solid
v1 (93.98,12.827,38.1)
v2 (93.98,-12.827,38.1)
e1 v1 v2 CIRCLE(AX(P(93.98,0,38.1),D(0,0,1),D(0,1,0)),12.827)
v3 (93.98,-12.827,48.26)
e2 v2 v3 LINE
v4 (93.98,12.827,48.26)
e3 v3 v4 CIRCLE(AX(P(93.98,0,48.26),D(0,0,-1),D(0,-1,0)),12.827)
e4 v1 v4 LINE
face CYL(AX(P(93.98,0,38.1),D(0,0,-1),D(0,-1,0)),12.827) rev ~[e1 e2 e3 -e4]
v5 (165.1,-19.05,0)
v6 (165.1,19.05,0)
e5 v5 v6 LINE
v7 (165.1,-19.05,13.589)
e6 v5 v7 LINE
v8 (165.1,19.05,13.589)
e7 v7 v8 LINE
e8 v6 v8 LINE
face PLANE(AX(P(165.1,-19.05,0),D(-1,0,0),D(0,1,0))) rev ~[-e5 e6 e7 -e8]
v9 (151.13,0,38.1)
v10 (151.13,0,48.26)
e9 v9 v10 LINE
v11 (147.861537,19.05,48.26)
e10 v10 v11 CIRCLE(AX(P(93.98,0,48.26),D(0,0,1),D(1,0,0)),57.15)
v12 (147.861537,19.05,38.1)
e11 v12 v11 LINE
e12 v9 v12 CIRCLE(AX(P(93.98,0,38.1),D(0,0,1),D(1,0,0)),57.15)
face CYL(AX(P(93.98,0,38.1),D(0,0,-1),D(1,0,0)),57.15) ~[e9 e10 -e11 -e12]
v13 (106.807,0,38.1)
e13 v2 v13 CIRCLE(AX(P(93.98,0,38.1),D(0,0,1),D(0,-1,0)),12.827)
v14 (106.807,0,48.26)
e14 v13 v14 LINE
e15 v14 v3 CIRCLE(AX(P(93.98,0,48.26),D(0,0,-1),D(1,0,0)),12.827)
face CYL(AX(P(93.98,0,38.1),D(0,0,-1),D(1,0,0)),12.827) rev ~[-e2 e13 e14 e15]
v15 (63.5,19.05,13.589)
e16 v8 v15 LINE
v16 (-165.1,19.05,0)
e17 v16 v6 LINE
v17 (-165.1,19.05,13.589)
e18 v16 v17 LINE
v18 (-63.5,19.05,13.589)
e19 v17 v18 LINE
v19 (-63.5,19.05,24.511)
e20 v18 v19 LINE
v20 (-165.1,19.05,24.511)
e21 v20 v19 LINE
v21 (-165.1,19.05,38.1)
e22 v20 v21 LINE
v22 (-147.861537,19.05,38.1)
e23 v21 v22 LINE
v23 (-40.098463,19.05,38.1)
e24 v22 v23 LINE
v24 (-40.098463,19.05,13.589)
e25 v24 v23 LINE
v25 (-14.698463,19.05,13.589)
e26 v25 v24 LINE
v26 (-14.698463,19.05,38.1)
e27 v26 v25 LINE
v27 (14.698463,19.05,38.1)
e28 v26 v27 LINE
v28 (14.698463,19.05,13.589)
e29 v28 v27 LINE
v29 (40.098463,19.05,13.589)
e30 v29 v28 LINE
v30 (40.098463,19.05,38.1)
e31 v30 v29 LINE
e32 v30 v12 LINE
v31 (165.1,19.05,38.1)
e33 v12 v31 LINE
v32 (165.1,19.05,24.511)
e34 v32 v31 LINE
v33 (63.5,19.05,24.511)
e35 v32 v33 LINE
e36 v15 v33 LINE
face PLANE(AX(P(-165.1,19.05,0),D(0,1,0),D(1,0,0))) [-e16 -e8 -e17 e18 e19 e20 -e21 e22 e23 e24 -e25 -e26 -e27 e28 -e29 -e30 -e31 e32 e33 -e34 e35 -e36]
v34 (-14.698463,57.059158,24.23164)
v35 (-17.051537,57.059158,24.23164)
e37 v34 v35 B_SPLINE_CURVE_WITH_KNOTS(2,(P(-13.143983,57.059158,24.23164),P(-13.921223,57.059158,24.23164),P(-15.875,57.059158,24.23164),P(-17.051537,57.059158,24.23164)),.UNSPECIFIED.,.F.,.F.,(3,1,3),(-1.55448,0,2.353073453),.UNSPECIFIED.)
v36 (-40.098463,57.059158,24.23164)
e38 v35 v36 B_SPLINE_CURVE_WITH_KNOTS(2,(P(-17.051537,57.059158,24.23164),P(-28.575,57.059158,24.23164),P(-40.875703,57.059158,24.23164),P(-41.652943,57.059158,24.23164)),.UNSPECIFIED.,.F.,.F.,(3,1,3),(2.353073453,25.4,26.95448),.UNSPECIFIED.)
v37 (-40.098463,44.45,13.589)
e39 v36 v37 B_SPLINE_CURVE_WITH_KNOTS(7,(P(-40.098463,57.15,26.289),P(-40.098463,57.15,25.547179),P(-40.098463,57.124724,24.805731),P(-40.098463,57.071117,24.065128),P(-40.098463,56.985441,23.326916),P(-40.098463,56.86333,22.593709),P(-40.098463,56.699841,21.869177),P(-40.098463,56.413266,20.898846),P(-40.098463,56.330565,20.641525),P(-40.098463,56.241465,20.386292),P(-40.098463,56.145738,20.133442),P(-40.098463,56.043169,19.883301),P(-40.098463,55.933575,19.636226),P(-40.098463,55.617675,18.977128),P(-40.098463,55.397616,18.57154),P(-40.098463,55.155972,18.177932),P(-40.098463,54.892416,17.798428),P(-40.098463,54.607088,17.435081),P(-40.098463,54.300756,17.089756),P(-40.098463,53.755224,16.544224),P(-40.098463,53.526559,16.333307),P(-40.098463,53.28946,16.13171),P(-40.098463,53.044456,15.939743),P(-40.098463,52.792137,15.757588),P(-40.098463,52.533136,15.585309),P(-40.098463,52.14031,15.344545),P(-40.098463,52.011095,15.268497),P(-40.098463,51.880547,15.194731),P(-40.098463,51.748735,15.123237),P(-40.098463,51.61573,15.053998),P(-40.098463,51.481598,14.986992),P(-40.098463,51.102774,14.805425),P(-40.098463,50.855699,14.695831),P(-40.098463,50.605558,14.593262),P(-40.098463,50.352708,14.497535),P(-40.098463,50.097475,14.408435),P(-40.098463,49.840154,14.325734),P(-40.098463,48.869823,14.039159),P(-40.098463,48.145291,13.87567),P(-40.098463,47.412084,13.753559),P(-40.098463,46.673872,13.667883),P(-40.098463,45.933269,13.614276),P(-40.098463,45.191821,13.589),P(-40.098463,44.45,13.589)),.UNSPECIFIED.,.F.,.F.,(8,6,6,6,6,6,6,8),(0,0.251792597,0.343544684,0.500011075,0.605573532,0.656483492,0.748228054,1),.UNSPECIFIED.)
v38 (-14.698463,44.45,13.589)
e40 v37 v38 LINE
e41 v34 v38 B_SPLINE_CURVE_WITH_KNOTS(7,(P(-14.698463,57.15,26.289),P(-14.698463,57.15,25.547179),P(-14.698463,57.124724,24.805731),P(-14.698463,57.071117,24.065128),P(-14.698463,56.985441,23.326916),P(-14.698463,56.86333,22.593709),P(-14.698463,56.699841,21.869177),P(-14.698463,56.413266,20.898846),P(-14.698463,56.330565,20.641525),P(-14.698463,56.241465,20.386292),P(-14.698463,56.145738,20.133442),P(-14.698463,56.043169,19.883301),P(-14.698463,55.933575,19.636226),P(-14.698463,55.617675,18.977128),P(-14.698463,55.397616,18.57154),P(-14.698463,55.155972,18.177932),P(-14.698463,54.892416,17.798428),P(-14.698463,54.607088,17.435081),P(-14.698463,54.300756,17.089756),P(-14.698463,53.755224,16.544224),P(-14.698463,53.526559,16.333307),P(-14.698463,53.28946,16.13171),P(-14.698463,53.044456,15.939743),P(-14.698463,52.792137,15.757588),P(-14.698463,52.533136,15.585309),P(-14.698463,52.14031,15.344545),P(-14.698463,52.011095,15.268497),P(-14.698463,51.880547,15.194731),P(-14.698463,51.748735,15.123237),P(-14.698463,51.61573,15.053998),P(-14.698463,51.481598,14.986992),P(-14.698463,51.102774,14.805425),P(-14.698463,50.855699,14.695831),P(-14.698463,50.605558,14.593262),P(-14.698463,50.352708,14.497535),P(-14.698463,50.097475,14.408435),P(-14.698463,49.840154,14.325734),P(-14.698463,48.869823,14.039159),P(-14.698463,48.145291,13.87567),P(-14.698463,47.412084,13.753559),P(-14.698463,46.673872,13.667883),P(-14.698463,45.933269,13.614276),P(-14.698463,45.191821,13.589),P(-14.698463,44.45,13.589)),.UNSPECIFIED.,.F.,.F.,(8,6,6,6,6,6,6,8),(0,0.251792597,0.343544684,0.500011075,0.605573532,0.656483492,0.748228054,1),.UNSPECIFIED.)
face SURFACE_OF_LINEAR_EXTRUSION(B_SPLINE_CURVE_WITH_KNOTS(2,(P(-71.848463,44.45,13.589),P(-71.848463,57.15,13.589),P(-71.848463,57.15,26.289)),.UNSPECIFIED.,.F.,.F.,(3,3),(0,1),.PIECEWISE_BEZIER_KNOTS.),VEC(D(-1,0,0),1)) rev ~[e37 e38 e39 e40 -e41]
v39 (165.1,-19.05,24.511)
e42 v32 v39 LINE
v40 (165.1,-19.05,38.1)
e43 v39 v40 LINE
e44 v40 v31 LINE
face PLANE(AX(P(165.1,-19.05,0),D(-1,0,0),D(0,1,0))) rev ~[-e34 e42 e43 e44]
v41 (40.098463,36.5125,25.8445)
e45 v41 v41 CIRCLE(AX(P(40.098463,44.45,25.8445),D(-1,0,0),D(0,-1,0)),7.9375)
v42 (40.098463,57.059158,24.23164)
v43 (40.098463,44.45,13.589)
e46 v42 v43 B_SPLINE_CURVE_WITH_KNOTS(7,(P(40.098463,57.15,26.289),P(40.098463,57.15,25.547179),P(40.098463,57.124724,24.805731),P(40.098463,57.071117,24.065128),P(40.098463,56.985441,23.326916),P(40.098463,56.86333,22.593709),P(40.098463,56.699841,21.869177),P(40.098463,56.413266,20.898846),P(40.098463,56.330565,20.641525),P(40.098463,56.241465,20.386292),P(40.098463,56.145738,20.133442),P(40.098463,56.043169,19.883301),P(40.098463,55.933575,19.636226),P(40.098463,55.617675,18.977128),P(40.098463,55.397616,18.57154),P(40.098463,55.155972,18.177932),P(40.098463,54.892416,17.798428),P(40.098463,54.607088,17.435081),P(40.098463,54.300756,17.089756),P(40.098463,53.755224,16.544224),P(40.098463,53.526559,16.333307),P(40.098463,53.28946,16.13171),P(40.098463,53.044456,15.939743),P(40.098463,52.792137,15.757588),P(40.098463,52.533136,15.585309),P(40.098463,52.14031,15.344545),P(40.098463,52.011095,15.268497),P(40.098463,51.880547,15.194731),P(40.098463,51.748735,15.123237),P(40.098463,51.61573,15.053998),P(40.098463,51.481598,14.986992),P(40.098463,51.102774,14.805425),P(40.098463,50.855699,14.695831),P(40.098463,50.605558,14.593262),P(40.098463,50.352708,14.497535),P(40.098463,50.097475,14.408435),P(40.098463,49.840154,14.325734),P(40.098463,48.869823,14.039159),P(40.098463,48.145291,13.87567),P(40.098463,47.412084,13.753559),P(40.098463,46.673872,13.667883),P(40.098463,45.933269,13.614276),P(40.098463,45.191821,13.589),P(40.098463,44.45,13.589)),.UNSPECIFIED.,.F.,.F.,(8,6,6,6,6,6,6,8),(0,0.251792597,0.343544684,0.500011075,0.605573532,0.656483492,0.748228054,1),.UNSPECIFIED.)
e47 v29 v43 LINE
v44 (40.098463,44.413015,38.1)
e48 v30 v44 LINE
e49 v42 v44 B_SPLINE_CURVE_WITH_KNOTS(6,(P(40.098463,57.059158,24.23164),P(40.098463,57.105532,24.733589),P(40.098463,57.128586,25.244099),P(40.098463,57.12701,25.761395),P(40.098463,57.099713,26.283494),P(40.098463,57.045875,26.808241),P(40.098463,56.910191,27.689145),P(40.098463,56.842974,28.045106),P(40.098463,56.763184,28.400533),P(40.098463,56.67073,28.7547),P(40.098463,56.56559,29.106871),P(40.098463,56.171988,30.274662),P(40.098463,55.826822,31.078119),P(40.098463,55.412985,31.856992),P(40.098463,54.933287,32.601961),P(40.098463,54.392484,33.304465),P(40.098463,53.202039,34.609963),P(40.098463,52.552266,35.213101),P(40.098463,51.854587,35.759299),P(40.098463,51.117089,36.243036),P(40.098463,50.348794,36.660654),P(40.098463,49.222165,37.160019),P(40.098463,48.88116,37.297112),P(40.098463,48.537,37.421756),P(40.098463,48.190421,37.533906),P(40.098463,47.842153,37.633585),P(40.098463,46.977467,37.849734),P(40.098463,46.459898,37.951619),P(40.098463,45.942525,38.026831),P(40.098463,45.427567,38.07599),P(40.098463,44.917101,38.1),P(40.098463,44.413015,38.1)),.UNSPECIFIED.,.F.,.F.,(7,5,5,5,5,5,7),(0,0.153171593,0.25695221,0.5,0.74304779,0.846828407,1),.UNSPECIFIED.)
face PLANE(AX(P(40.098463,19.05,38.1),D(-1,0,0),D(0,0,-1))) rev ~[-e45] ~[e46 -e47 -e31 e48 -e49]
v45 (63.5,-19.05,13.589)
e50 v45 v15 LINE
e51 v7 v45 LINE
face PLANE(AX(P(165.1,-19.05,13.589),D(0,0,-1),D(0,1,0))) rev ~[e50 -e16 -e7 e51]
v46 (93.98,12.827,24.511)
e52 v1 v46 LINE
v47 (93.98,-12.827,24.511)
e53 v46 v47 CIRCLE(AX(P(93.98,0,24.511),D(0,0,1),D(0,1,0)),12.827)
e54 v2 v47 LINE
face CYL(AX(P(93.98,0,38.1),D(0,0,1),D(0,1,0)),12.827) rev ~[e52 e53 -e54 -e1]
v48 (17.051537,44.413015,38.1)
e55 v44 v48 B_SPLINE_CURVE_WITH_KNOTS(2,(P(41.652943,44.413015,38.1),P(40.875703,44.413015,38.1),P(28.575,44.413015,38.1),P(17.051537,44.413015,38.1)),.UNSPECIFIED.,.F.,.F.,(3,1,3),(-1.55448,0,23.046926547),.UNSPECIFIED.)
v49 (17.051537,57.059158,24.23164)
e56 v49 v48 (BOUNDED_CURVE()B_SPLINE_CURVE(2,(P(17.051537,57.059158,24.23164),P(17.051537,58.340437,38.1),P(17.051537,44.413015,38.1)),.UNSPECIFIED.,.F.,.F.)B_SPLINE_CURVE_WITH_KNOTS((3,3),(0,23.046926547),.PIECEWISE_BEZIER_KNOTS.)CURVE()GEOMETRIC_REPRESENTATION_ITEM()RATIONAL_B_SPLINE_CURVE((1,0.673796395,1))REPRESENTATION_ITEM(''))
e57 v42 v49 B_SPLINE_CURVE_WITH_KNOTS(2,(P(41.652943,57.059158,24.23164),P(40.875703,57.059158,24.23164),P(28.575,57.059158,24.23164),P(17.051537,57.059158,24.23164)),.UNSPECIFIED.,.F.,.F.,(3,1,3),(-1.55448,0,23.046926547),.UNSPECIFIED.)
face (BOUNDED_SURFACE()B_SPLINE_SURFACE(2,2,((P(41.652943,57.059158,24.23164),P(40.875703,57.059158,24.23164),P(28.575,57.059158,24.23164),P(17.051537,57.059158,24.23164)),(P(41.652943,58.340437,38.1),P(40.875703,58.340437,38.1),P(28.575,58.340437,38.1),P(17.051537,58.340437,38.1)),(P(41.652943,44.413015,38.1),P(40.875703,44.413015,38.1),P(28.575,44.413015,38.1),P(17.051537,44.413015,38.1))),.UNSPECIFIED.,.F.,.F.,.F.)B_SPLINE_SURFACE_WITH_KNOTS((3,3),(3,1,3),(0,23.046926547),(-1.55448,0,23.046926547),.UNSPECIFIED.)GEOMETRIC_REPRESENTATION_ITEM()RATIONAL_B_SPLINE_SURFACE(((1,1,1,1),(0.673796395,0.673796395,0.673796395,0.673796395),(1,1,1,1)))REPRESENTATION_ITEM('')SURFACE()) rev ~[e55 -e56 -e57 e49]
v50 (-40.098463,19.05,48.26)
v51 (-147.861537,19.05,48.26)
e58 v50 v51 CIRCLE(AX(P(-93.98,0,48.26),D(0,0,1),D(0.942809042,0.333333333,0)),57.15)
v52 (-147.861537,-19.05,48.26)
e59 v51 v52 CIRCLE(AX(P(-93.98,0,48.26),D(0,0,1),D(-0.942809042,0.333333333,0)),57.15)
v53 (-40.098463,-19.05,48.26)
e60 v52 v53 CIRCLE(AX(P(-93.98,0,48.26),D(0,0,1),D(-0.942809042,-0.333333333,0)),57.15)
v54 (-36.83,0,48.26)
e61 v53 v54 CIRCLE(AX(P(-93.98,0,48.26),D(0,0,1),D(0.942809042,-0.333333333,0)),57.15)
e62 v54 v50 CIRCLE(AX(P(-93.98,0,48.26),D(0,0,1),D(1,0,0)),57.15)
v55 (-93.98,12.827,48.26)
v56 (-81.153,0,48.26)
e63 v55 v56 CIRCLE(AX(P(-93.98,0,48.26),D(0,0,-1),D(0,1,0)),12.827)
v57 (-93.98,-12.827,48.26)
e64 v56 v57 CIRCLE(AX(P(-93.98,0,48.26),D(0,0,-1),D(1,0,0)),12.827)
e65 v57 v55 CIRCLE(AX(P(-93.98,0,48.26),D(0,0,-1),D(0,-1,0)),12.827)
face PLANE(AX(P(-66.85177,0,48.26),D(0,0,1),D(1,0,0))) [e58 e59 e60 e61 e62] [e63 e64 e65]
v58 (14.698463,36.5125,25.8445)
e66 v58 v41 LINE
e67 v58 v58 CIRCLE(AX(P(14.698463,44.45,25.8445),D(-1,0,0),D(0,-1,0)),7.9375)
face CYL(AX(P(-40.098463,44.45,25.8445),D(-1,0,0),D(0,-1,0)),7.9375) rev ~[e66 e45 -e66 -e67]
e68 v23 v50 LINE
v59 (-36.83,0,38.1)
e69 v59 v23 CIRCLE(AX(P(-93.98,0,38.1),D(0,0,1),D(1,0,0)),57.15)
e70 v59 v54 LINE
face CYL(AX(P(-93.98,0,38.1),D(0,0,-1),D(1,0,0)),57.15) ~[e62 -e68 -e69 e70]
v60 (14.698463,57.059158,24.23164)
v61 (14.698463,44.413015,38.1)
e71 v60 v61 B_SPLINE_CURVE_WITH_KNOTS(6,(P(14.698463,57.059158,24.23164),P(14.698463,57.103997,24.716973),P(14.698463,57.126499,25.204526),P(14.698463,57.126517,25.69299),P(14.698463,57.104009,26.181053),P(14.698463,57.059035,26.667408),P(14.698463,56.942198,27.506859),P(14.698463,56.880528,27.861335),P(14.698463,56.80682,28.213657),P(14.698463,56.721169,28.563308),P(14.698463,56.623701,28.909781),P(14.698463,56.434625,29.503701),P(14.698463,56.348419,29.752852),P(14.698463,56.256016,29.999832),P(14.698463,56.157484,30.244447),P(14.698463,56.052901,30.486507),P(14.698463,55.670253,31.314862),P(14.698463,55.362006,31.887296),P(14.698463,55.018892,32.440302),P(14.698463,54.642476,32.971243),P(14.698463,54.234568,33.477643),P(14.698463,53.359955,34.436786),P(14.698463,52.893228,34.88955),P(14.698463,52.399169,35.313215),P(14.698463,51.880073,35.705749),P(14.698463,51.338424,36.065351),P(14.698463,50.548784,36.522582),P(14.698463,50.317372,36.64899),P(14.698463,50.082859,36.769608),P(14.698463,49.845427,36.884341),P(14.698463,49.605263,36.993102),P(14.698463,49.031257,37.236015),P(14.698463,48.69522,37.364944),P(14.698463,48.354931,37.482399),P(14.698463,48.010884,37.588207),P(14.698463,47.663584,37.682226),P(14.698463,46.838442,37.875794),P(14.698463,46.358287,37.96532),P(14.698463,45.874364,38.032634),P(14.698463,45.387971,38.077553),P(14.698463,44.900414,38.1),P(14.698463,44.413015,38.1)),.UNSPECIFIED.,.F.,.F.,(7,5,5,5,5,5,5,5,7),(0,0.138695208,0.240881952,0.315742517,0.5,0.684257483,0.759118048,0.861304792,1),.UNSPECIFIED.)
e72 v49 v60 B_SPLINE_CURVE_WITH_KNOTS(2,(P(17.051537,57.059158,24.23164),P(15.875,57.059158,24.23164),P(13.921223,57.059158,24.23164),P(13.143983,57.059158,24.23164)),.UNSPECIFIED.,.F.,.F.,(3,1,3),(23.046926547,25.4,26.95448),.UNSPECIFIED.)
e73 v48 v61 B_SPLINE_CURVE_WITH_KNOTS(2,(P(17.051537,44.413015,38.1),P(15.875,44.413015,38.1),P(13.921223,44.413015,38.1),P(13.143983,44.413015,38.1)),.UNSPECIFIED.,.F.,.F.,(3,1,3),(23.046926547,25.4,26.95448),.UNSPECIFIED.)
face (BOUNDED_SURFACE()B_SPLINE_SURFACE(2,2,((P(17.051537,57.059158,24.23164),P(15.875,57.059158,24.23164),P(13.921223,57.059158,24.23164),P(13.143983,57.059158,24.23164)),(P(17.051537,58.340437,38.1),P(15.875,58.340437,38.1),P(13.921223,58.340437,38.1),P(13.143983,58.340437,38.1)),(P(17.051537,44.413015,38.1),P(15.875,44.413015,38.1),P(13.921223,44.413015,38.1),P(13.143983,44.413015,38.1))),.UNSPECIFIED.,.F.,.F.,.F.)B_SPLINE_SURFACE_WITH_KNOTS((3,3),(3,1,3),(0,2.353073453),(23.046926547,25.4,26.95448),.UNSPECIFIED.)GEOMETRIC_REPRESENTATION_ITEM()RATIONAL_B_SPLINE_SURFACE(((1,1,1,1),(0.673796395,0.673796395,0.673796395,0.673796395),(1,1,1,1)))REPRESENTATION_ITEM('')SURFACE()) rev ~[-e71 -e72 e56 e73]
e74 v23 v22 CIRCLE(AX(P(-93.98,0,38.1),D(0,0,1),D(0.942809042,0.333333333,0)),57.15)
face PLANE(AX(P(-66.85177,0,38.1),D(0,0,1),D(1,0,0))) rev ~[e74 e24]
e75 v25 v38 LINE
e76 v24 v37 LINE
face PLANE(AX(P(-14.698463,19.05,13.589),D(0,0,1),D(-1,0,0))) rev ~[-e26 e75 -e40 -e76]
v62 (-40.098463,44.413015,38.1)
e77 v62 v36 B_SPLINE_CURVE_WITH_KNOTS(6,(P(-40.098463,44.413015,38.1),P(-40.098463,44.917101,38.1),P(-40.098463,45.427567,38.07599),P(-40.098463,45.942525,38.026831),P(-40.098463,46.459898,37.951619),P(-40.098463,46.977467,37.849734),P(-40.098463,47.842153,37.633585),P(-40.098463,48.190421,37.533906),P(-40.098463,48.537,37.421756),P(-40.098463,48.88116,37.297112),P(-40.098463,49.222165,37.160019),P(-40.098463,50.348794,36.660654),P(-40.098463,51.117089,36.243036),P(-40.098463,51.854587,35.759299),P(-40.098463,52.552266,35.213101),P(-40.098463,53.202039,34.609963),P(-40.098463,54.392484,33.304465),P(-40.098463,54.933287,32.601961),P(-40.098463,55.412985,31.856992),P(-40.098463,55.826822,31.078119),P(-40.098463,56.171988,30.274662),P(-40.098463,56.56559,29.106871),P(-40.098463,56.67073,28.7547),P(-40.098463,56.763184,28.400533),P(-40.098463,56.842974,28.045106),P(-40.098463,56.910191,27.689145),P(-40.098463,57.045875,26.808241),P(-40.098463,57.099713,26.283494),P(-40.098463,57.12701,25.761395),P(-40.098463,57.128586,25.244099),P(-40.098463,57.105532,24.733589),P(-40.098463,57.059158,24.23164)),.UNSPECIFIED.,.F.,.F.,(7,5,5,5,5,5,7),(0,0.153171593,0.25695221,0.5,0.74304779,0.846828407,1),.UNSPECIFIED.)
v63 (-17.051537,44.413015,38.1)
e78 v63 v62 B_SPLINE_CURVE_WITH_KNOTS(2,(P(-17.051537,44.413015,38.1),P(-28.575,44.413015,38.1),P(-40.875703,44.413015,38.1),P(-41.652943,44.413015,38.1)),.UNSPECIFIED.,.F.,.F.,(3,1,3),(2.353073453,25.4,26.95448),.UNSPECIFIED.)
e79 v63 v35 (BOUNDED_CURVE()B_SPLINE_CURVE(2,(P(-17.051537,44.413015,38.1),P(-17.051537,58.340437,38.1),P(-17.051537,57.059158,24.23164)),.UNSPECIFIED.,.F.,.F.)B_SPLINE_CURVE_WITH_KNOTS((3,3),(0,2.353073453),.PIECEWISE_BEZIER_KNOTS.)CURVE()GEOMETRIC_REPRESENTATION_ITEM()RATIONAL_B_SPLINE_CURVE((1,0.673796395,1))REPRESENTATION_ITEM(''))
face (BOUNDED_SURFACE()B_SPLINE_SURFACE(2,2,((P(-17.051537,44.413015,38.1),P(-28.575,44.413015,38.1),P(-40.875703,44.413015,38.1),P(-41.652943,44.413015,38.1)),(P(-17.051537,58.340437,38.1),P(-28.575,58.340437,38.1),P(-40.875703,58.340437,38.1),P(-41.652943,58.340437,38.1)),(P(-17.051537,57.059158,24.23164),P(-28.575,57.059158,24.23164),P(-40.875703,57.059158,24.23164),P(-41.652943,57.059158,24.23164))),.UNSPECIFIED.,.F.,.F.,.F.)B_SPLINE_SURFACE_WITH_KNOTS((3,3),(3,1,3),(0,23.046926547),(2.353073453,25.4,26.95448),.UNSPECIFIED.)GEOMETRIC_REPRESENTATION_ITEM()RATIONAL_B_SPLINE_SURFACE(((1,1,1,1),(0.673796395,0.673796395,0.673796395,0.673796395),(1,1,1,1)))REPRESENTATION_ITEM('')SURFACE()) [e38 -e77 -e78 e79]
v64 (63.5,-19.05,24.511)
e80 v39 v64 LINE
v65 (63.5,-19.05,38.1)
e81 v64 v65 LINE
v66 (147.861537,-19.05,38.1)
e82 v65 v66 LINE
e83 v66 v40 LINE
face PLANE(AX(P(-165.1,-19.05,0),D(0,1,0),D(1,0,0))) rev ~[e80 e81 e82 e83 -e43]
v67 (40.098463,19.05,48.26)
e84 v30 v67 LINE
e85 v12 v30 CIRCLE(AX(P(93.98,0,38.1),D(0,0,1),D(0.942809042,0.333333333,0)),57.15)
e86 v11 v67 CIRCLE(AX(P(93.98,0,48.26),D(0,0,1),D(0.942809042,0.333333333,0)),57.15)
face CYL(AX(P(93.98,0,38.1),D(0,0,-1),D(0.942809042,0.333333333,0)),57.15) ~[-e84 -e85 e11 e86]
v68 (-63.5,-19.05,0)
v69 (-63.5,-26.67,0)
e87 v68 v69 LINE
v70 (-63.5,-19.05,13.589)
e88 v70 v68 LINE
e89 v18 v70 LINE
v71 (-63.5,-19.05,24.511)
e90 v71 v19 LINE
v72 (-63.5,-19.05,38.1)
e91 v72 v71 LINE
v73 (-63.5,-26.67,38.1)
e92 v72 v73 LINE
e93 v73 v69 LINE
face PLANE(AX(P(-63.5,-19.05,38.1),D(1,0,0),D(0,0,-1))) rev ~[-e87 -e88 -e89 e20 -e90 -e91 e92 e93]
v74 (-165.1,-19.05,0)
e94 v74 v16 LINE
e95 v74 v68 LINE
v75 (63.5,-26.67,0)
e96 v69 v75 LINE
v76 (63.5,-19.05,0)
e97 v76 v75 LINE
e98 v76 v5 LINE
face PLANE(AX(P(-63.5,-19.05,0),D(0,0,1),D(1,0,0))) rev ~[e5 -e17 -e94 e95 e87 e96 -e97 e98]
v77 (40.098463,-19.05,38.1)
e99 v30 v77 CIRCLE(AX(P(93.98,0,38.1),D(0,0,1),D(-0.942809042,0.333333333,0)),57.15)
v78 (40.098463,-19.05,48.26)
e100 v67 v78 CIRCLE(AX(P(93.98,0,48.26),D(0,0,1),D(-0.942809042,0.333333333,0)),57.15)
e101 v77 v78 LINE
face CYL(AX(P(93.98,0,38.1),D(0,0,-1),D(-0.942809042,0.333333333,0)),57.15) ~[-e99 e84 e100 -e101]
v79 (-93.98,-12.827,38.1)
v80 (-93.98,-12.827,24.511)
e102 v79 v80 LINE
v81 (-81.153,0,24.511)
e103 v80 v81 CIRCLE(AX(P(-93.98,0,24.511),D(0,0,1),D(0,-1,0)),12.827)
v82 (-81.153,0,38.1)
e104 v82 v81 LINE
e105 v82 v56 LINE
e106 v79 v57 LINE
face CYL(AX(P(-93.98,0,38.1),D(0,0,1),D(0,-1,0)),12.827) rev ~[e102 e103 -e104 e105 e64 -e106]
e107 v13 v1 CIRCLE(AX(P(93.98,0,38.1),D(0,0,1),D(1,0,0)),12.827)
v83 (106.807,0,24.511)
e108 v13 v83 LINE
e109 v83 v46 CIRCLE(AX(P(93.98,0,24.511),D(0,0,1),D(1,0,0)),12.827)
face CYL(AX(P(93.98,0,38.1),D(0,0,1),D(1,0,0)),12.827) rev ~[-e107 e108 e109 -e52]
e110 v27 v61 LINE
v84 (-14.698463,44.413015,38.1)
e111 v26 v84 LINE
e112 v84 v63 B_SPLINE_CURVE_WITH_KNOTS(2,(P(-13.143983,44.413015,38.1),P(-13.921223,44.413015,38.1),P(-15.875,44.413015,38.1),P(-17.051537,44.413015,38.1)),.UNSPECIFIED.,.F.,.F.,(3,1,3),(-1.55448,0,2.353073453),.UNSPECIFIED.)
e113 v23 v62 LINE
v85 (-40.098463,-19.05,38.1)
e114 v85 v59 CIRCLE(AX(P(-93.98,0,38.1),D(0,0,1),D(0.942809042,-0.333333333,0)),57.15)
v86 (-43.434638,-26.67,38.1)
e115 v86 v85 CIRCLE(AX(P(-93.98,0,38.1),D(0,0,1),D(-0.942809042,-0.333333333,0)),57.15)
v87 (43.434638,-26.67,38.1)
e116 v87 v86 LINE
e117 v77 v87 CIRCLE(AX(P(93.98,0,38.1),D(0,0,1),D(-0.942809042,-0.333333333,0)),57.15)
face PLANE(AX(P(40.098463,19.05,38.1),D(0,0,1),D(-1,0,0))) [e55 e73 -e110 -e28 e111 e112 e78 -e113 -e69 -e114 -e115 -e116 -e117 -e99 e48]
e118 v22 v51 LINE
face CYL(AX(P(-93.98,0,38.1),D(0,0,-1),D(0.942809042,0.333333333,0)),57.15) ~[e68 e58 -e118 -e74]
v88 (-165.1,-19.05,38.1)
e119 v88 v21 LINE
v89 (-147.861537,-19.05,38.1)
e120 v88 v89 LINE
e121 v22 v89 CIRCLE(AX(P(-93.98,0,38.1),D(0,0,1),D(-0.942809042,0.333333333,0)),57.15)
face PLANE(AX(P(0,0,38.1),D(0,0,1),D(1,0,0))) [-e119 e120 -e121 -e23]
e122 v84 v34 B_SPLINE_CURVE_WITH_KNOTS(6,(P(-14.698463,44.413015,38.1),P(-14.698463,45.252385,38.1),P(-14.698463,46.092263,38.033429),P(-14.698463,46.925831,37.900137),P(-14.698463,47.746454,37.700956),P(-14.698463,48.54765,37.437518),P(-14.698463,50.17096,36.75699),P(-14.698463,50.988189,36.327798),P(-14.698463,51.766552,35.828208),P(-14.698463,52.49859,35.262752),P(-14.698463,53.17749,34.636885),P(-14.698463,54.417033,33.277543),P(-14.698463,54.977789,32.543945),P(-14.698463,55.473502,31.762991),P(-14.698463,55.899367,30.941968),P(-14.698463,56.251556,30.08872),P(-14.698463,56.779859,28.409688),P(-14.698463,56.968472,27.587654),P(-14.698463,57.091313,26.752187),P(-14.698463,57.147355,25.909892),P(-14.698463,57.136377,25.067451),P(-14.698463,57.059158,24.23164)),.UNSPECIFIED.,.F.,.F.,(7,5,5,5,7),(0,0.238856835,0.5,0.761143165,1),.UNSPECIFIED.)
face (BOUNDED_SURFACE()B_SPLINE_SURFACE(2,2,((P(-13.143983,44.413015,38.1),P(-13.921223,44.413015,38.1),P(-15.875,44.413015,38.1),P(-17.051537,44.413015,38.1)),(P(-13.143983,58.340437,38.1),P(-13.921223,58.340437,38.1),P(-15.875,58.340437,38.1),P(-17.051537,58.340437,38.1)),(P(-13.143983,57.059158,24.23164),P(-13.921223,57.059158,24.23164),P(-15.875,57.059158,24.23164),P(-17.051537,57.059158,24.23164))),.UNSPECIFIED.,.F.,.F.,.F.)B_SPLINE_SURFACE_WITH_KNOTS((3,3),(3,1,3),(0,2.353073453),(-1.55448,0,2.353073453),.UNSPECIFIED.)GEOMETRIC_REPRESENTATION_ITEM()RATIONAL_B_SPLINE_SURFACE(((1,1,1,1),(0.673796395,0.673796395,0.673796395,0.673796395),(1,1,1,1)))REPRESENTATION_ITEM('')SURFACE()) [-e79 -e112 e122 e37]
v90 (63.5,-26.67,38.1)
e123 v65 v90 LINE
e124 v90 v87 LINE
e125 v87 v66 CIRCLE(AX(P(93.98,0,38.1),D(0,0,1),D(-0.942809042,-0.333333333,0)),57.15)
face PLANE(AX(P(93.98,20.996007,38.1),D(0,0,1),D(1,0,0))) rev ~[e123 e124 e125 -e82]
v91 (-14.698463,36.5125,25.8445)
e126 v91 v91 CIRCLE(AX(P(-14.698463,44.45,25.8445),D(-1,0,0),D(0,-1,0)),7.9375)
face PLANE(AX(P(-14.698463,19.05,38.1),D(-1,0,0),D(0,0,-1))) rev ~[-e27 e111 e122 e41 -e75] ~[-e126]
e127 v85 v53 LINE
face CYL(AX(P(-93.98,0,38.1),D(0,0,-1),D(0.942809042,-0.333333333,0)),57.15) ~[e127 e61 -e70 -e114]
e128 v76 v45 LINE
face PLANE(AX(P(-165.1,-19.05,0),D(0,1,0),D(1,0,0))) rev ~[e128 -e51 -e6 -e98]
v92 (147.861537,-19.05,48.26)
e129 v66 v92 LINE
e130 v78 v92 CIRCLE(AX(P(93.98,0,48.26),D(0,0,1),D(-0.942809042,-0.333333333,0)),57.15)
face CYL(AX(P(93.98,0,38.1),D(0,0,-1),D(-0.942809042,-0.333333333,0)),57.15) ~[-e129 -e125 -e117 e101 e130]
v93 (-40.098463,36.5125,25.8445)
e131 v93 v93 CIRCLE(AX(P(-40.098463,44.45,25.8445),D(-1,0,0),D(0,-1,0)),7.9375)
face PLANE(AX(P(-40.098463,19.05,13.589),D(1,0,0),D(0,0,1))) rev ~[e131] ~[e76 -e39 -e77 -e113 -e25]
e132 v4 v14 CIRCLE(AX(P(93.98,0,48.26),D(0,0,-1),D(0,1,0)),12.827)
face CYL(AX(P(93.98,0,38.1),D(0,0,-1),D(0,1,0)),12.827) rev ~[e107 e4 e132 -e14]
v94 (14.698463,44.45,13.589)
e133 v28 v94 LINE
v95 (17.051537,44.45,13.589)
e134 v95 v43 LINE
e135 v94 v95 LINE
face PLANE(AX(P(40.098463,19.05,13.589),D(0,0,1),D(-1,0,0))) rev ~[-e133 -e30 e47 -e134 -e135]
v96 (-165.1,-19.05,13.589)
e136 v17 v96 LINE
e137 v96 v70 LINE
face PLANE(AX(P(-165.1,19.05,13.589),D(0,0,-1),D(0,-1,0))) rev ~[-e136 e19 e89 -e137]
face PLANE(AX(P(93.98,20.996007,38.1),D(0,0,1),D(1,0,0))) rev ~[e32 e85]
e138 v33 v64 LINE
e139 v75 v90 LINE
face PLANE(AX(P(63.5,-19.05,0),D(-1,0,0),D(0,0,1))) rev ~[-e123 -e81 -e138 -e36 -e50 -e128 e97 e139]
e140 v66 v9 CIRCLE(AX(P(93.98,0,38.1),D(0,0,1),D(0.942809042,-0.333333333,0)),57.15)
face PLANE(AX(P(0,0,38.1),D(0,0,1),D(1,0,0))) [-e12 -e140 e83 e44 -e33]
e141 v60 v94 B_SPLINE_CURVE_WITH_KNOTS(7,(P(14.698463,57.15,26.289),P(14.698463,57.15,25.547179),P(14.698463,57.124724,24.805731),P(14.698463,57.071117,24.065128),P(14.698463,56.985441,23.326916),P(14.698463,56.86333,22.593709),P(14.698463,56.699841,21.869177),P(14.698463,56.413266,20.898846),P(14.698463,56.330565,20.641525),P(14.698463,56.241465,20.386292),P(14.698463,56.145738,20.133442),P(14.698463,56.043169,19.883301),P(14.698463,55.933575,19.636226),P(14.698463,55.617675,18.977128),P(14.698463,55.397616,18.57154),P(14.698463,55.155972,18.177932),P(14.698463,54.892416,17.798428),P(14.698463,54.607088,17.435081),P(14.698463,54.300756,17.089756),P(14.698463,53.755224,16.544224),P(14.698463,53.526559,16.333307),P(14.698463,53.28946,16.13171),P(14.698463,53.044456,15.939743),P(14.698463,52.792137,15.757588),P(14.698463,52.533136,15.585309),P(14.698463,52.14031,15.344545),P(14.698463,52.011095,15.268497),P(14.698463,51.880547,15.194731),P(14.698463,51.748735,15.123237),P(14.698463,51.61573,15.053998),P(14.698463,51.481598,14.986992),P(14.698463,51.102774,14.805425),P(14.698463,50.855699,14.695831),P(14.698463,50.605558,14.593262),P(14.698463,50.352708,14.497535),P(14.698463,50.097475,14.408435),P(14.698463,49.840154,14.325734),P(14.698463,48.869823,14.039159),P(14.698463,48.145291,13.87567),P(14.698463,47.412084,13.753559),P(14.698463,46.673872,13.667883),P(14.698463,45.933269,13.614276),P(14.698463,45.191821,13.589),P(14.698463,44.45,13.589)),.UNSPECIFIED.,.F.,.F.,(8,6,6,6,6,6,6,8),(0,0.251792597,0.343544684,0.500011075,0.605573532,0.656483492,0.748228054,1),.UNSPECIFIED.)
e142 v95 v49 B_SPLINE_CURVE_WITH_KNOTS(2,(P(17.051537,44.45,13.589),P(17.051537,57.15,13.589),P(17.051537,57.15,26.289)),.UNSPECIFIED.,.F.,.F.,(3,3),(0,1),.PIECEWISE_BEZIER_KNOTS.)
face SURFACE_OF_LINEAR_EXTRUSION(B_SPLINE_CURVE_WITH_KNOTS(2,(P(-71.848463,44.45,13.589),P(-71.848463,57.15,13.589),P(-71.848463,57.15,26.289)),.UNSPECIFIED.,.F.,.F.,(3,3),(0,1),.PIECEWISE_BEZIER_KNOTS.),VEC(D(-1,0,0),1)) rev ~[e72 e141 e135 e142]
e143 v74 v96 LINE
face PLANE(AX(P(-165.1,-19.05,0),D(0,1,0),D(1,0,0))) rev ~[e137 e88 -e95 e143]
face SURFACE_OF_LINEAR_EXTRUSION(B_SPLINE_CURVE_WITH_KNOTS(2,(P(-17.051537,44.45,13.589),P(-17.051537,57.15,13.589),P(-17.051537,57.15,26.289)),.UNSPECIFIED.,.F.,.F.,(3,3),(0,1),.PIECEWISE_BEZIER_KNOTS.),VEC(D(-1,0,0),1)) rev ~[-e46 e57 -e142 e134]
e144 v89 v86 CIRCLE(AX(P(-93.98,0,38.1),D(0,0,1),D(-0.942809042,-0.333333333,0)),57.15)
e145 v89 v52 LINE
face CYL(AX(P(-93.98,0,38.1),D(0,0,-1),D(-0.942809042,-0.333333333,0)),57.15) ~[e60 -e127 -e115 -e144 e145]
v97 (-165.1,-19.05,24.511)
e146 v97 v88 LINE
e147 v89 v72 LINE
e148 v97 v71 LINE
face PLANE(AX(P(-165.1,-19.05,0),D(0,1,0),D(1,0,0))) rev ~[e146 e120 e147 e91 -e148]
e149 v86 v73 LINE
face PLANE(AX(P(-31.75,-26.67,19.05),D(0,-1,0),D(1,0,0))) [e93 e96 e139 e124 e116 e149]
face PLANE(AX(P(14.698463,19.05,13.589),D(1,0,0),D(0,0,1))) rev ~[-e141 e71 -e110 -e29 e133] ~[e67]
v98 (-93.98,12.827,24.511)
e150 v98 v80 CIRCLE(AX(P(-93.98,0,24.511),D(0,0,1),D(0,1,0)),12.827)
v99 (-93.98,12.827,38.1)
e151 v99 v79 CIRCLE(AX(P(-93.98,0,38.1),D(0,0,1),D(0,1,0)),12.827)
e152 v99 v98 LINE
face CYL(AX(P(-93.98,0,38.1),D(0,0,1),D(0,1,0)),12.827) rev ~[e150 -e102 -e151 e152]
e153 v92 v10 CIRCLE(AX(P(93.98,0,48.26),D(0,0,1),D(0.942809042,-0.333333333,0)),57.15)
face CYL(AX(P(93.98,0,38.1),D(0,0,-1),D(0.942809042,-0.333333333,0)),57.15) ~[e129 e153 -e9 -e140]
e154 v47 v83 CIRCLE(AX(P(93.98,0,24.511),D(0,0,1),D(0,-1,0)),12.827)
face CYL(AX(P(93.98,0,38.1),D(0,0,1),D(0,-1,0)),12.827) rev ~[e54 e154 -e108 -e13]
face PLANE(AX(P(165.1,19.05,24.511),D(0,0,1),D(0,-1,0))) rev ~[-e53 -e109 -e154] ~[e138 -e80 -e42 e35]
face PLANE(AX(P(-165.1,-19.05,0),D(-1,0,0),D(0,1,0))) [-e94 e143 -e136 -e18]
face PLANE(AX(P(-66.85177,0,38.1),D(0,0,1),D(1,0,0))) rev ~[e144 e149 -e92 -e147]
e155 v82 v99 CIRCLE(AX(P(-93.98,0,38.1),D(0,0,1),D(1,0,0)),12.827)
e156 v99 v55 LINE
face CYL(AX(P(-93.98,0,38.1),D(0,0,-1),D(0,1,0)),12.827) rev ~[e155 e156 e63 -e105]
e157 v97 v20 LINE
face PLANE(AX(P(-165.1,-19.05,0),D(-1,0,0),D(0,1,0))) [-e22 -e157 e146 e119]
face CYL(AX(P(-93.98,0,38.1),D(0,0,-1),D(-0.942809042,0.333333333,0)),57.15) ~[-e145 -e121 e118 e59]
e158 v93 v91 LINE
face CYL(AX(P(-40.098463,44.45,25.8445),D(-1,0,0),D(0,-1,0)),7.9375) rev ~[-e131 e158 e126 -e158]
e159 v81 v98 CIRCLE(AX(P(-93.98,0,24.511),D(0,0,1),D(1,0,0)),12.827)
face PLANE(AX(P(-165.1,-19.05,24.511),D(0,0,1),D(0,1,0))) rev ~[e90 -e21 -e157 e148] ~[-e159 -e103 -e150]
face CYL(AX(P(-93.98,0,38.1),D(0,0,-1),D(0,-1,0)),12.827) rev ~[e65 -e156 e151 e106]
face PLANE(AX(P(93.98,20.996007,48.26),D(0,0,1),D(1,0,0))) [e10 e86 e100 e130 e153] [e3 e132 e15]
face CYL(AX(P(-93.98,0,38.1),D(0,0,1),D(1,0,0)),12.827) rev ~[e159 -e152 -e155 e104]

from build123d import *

# Parameters (mm, degrees)
F0_W         = 330.2
F0_H         = 38.1
F1_DEPTH     = 38.1
F2_W         = 19.05
F2_H         = 10.922
F3_DEPTH     = 101.6
F4_W         = 19.05
F4_H         = 10.922
F5_DEPTH     = 101.6
F7_DEPTH     = 22.86
F8_DEPTH     = 10.16
F10_DEPTH    = 7.62
F11_W        = 25.4
F11_H        = 13.589
F11_H_2      = 10.922
F12_DEPTH    = 38.1
F13_T1_DEPTH = 88.9
F13_T3_DEPTH = 88.9
F14_R        = 12.7
F16_DEPTH    = 101.6


# Not quite as in the source:
# - a fillet or chamfer that OpenCascade refuses, or shapes differently, is made with other operations: its cross-section is extruded or revolved along the edge and cut away or added
# - after a boolean that leaves OpenCascade's solid faulty, fix() repairs it
# - a feature names something its author has since deleted; it is built from what else it names


with BuildPart() as f1:
    # F0 (on Top) → F1 (new body)
    with BuildSketch(Plane.XY):
        Rectangle(F0_W, F0_H)
    extrude(amount=F1_DEPTH)

    # F2 (on face) → F3 (cut)
    with BuildSketch(Plane(origin=(-165.1, 0, 0), x_dir=(0, -1, 0), z_dir=(-1, 0, 0))):
        with Locations((9.525, 19.05)):
            Rectangle(F2_W, F2_H)
        with Locations((-9.525, 19.05)):
            Rectangle(F2_W, F2_H)
    extrude(amount=-F3_DEPTH, mode=Mode.SUBTRACT)

    # F4 (on face) → F5 (cut)
    with BuildSketch(Plane.YZ.offset(165.1)):
        with Locations((-9.525, 19.05)):
            Rectangle(F4_W, F4_H)
        with Locations((9.525, 19.05)):
            Rectangle(F4_W, F4_H)
    extrude(amount=-F5_DEPTH, mode=Mode.SUBTRACT)

    # F6 (on face) → F7 (cut)
    with BuildSketch(Plane.XY.offset(38.1)):
        with BuildLine():
            Line((-93.98, 12.827), (-93.98, -12.827))
            ThreePointArc((-93.98, -12.827), (-84.9099413177, -9.0700586823), (-81.153, 0))
            ThreePointArc((-81.153, 0), (-84.9099413177, 9.0700586823), (-93.98, 12.827))
        make_face()
        with BuildLine():
            ThreePointArc((-93.98, 12.827), (-106.807, 0), (-93.98, -12.827))
            Line((-93.98, -12.827), (-93.98, 12.827))
        make_face()
        with BuildLine():
            ThreePointArc((93.98, 12.827), (81.153, 0), (93.98, -12.827))
            Line((93.98, -12.827), (93.98, 12.827))
        make_face()
        with BuildLine():
            Line((93.98, 12.827), (93.98, -12.827))
            ThreePointArc((93.98, -12.827), (103.0500586823, -9.0700586823), (106.807, 0))
            ThreePointArc((106.807, 0), (103.0500586823, 9.0700586823), (93.98, 12.827))
        make_face()
    extrude(amount=-F7_DEPTH, mode=Mode.SUBTRACT)

    # F6 (on face) → F8 (join)
    with BuildSketch(Plane.XY.offset(38.1)):
        with BuildLine():
            ThreePointArc((110.7805208253, 19.05), (93.98, 25.4), (77.1794791747, 19.05))
            Line((77.1794791747, 19.05), (93.98, 19.05))
            Line((93.98, 19.05), (110.7805208253, 19.05))
        make_face()
        with BuildLine():
            Line((110.7805208253, -19.05), (147.8615367264, -19.05))
            ThreePointArc((147.8615367264, -19.05), (150.3069576842, -9.6641780842), (151.13, 0))
            ThreePointArc((151.13, 0), (150.3069576842, 9.6641780842), (147.8615367264, 19.05))
            Line((147.8615367264, 19.05), (110.7805208253, 19.05))
            ThreePointArc((110.7805208253, 19.05), (117.1305208253, 10.4505208253), (119.38, 0))
            ThreePointArc((119.38, 0), (117.1305208253, -10.4505208253), (110.7805208253, -19.05))
        make_face()
        with BuildLine():
            ThreePointArc((147.8615367264, 19.05), (93.98, 57.15), (40.0984632736, 19.05))
            Line((40.0984632736, 19.05), (77.1794791747, 19.05))
            ThreePointArc((77.1794791747, 19.05), (93.98, 25.4), (110.7805208253, 19.05))
            Line((110.7805208253, 19.05), (147.8615367264, 19.05))
        make_face()
        with BuildLine():
            ThreePointArc((77.1794791747, 19.05), (68.58, 0), (77.1794791747, -19.05))
            Line((77.1794791747, -19.05), (93.98, -19.05))
            Line((93.98, -19.05), (93.98, -12.827))
            ThreePointArc((93.98, -12.827), (81.153, 0), (93.98, 12.827))
            Line((93.98, 12.827), (93.98, 19.05))
            Line((93.98, 19.05), (77.1794791747, 19.05))
        make_face()
        with BuildLine():
            Line((93.98, -19.05), (110.7805208253, -19.05))
            ThreePointArc((110.7805208253, -19.05), (117.1305208253, -10.4505208253), (119.38, 0))
            ThreePointArc((119.38, 0), (117.1305208253, 10.4505208253), (110.7805208253, 19.05))
            Line((110.7805208253, 19.05), (93.98, 19.05))
            Line((93.98, 19.05), (93.98, 12.827))
            ThreePointArc((93.98, 12.827), (103.0500586823, 9.0700586823), (106.807, 0))
            ThreePointArc((106.807, 0), (103.0500586823, -9.0700586823), (93.98, -12.827))
            Line((93.98, -12.827), (93.98, -19.05))
        make_face()
        with BuildLine():
            ThreePointArc((40.0984632736, 19.05), (36.83, 0), (40.0984632736, -19.05))
            Line((40.0984632736, -19.05), (77.1794791747, -19.05))
            ThreePointArc((77.1794791747, -19.05), (68.58, 0), (77.1794791747, 19.05))
            Line((77.1794791747, 19.05), (40.0984632736, 19.05))
        make_face()
        with BuildLine():
            Line((77.1794791747, -19.05), (40.0984632736, -19.05))
            ThreePointArc((40.0984632736, -19.05), (93.98, -57.15), (147.8615367264, -19.05))
            Line((147.8615367264, -19.05), (110.7805208253, -19.05))
            ThreePointArc((110.7805208253, -19.05), (93.98, -25.4), (77.1794791747, -19.05))
        make_face()
        with BuildLine():
            Line((93.98, -19.05), (77.1794791747, -19.05))
            ThreePointArc((77.1794791747, -19.05), (93.98, -25.4), (110.7805208253, -19.05))
            Line((110.7805208253, -19.05), (93.98, -19.05))
        make_face()
        with BuildLine():
            Line((-93.98, -12.827), (-93.98, -19.05))
            Line((-93.98, -19.05), (-40.0984632736, -19.05))
            ThreePointArc((-40.0984632736, -19.05), (-37.6530423158, -9.6641780842), (-36.83, 0))
            ThreePointArc((-36.83, 0), (-37.6530423158, 9.6641780842), (-40.0984632736, 19.05))
            Line((-40.0984632736, 19.05), (-93.98, 19.05))
            Line((-93.98, 19.05), (-93.98, 12.827))
            ThreePointArc((-93.98, 12.827), (-84.9099413177, 9.0700586823), (-81.153, 0))
            ThreePointArc((-81.153, 0), (-84.9099413177, -9.0700586823), (-93.98, -12.827))
        make_face()
        with BuildLine():
            Line((-147.8615367264, -19.05), (-93.98, -19.05))
            Line((-93.98, -19.05), (-93.98, -12.827))
            ThreePointArc((-93.98, -12.827), (-106.807, 0), (-93.98, 12.827))
            Line((-93.98, 12.827), (-93.98, 19.05))
            Line((-93.98, 19.05), (-147.8615367264, 19.05))
            ThreePointArc((-147.8615367264, 19.05), (-151.13, 0), (-147.8615367264, -19.05))
        make_face()
        with BuildLine():
            Line((-40.0984632736, -19.05), (-93.98, -19.05))
            Line((-93.98, -19.05), (-147.8615367264, -19.05))
            ThreePointArc((-147.8615367264, -19.05), (-93.98, -57.15), (-40.0984632736, -19.05))
        make_face()
        with BuildLine():
            ThreePointArc((-40.0984632736, 19.05), (-93.98, 57.15), (-147.8615367264, 19.05))
            Line((-147.8615367264, 19.05), (-93.98, 19.05))
            Line((-93.98, 19.05), (-40.0984632736, 19.05))
        make_face()
    extrude(amount=F8_DEPTH)

    # F9 (on face) → F10 (join)
    with BuildSketch(Plane.XZ.offset(19.05)):
        Polygon((0, 0), (0, 38.1), (-40.0984632736, 38.1), (-63.5, 38.1), (-63.5, 30.861), (-63.5, 24.511), (-63.5, 19.939), (-63.5, 13.589), (-63.5, 0), align=None)
        Polygon((63.5, 30.861), (63.5, 38.1), (40.0984632736, 38.1), (13.5538854515, 38.1), (0, 38.1), (0, 0), (63.5, 0), (63.5, 13.589), (63.5, 19.939), (63.5, 24.511), align=None)
    extrude(amount=F10_DEPTH)

    add(f1.part.fix(), mode=Mode.REPLACE)

    # F11 (on face) → F12 (join)
    with BuildSketch(Plane(origin=(0, 19.05, 0), x_dir=(-1, 0, 0), z_dir=(0, 1, 0))):
        with Locations((-27.3984632736, 31.3055)):
            Rectangle(F11_W, F11_H)
        with Locations((-27.3984632736, 19.05)):
            Rectangle(F11_W, F11_H_2)
        with Locations((27.3984632736, 19.05)):
            Rectangle(F11_W, F11_H_2)
        with Locations((27.3984632736, 31.3055)):
            Rectangle(F11_W, F11_H)
    extrude(amount=F12_DEPTH)

    # F13: fillet of radius 12.7 on 2 edges, made by hand

    # F13_s2 → F13_t1 (cut)
    with BuildSketch(Plane.YZ.offset(-71.8484632736)):
        with BuildLine():
            add(Edge.make_bspline(
                [(44.45, 13.589), (57.15, 13.589), (57.15, 26.289)],
                knots=[0, 0, 0, 1, 1, 1], degree=2, weights=[1, 1, 1]))
            Line((57.15, 26.289), (57.15, 13.589))
            Line((57.15, 13.589), (44.45, 13.589))
        make_face()
    extrude(amount=F13_T1_DEPTH, mode=Mode.SUBTRACT)

    # F13_s4 → F13_t3 (cut)
    with BuildSketch(Plane.YZ.offset(-17.0515367264)):
        with BuildLine():
            add(Edge.make_bspline(
                [(44.45, 13.589), (57.15, 13.589), (57.15, 26.289)],
                knots=[0, 0, 0, 1, 1, 1], degree=2, weights=[1, 1, 1]))
            Line((57.15, 26.289), (57.15, 13.589))
            Line((57.15, 13.589), (44.45, 13.589))
        make_face()
    extrude(amount=F13_T3_DEPTH, mode=Mode.SUBTRACT)

    # F14
    f14_edges = [f1.edges().sort_by_distance(p)[0] for p in [
        (27.398463, 57.15, 38.1),
        (-27.398463, 57.15, 38.1),
    ]]
    fillet(f14_edges, radius=F14_R)

    # F15 (on face) → F16 (cut)
    with BuildSketch(Plane(origin=(-40.0984632736, 0, 0), x_dir=(0, -1, 0), z_dir=(-1, 0, 0))):
        with BuildLine():
            ThreePointArc((-52.3875, 25.8445), (-44.45, 17.907), (-36.5125, 25.8445))
            Line((-36.5125, 25.8445), (-52.3875, 25.8445))
        make_face()
        with BuildLine():
            Line((-52.3875, 25.8445), (-36.5125, 25.8445))
            ThreePointArc((-36.5125, 25.8445), (-44.45, 33.782), (-52.3875, 25.8445))
        make_face()
    extrude(amount=-F16_DEPTH, mode=Mode.SUBTRACT)


solid = f1.part
